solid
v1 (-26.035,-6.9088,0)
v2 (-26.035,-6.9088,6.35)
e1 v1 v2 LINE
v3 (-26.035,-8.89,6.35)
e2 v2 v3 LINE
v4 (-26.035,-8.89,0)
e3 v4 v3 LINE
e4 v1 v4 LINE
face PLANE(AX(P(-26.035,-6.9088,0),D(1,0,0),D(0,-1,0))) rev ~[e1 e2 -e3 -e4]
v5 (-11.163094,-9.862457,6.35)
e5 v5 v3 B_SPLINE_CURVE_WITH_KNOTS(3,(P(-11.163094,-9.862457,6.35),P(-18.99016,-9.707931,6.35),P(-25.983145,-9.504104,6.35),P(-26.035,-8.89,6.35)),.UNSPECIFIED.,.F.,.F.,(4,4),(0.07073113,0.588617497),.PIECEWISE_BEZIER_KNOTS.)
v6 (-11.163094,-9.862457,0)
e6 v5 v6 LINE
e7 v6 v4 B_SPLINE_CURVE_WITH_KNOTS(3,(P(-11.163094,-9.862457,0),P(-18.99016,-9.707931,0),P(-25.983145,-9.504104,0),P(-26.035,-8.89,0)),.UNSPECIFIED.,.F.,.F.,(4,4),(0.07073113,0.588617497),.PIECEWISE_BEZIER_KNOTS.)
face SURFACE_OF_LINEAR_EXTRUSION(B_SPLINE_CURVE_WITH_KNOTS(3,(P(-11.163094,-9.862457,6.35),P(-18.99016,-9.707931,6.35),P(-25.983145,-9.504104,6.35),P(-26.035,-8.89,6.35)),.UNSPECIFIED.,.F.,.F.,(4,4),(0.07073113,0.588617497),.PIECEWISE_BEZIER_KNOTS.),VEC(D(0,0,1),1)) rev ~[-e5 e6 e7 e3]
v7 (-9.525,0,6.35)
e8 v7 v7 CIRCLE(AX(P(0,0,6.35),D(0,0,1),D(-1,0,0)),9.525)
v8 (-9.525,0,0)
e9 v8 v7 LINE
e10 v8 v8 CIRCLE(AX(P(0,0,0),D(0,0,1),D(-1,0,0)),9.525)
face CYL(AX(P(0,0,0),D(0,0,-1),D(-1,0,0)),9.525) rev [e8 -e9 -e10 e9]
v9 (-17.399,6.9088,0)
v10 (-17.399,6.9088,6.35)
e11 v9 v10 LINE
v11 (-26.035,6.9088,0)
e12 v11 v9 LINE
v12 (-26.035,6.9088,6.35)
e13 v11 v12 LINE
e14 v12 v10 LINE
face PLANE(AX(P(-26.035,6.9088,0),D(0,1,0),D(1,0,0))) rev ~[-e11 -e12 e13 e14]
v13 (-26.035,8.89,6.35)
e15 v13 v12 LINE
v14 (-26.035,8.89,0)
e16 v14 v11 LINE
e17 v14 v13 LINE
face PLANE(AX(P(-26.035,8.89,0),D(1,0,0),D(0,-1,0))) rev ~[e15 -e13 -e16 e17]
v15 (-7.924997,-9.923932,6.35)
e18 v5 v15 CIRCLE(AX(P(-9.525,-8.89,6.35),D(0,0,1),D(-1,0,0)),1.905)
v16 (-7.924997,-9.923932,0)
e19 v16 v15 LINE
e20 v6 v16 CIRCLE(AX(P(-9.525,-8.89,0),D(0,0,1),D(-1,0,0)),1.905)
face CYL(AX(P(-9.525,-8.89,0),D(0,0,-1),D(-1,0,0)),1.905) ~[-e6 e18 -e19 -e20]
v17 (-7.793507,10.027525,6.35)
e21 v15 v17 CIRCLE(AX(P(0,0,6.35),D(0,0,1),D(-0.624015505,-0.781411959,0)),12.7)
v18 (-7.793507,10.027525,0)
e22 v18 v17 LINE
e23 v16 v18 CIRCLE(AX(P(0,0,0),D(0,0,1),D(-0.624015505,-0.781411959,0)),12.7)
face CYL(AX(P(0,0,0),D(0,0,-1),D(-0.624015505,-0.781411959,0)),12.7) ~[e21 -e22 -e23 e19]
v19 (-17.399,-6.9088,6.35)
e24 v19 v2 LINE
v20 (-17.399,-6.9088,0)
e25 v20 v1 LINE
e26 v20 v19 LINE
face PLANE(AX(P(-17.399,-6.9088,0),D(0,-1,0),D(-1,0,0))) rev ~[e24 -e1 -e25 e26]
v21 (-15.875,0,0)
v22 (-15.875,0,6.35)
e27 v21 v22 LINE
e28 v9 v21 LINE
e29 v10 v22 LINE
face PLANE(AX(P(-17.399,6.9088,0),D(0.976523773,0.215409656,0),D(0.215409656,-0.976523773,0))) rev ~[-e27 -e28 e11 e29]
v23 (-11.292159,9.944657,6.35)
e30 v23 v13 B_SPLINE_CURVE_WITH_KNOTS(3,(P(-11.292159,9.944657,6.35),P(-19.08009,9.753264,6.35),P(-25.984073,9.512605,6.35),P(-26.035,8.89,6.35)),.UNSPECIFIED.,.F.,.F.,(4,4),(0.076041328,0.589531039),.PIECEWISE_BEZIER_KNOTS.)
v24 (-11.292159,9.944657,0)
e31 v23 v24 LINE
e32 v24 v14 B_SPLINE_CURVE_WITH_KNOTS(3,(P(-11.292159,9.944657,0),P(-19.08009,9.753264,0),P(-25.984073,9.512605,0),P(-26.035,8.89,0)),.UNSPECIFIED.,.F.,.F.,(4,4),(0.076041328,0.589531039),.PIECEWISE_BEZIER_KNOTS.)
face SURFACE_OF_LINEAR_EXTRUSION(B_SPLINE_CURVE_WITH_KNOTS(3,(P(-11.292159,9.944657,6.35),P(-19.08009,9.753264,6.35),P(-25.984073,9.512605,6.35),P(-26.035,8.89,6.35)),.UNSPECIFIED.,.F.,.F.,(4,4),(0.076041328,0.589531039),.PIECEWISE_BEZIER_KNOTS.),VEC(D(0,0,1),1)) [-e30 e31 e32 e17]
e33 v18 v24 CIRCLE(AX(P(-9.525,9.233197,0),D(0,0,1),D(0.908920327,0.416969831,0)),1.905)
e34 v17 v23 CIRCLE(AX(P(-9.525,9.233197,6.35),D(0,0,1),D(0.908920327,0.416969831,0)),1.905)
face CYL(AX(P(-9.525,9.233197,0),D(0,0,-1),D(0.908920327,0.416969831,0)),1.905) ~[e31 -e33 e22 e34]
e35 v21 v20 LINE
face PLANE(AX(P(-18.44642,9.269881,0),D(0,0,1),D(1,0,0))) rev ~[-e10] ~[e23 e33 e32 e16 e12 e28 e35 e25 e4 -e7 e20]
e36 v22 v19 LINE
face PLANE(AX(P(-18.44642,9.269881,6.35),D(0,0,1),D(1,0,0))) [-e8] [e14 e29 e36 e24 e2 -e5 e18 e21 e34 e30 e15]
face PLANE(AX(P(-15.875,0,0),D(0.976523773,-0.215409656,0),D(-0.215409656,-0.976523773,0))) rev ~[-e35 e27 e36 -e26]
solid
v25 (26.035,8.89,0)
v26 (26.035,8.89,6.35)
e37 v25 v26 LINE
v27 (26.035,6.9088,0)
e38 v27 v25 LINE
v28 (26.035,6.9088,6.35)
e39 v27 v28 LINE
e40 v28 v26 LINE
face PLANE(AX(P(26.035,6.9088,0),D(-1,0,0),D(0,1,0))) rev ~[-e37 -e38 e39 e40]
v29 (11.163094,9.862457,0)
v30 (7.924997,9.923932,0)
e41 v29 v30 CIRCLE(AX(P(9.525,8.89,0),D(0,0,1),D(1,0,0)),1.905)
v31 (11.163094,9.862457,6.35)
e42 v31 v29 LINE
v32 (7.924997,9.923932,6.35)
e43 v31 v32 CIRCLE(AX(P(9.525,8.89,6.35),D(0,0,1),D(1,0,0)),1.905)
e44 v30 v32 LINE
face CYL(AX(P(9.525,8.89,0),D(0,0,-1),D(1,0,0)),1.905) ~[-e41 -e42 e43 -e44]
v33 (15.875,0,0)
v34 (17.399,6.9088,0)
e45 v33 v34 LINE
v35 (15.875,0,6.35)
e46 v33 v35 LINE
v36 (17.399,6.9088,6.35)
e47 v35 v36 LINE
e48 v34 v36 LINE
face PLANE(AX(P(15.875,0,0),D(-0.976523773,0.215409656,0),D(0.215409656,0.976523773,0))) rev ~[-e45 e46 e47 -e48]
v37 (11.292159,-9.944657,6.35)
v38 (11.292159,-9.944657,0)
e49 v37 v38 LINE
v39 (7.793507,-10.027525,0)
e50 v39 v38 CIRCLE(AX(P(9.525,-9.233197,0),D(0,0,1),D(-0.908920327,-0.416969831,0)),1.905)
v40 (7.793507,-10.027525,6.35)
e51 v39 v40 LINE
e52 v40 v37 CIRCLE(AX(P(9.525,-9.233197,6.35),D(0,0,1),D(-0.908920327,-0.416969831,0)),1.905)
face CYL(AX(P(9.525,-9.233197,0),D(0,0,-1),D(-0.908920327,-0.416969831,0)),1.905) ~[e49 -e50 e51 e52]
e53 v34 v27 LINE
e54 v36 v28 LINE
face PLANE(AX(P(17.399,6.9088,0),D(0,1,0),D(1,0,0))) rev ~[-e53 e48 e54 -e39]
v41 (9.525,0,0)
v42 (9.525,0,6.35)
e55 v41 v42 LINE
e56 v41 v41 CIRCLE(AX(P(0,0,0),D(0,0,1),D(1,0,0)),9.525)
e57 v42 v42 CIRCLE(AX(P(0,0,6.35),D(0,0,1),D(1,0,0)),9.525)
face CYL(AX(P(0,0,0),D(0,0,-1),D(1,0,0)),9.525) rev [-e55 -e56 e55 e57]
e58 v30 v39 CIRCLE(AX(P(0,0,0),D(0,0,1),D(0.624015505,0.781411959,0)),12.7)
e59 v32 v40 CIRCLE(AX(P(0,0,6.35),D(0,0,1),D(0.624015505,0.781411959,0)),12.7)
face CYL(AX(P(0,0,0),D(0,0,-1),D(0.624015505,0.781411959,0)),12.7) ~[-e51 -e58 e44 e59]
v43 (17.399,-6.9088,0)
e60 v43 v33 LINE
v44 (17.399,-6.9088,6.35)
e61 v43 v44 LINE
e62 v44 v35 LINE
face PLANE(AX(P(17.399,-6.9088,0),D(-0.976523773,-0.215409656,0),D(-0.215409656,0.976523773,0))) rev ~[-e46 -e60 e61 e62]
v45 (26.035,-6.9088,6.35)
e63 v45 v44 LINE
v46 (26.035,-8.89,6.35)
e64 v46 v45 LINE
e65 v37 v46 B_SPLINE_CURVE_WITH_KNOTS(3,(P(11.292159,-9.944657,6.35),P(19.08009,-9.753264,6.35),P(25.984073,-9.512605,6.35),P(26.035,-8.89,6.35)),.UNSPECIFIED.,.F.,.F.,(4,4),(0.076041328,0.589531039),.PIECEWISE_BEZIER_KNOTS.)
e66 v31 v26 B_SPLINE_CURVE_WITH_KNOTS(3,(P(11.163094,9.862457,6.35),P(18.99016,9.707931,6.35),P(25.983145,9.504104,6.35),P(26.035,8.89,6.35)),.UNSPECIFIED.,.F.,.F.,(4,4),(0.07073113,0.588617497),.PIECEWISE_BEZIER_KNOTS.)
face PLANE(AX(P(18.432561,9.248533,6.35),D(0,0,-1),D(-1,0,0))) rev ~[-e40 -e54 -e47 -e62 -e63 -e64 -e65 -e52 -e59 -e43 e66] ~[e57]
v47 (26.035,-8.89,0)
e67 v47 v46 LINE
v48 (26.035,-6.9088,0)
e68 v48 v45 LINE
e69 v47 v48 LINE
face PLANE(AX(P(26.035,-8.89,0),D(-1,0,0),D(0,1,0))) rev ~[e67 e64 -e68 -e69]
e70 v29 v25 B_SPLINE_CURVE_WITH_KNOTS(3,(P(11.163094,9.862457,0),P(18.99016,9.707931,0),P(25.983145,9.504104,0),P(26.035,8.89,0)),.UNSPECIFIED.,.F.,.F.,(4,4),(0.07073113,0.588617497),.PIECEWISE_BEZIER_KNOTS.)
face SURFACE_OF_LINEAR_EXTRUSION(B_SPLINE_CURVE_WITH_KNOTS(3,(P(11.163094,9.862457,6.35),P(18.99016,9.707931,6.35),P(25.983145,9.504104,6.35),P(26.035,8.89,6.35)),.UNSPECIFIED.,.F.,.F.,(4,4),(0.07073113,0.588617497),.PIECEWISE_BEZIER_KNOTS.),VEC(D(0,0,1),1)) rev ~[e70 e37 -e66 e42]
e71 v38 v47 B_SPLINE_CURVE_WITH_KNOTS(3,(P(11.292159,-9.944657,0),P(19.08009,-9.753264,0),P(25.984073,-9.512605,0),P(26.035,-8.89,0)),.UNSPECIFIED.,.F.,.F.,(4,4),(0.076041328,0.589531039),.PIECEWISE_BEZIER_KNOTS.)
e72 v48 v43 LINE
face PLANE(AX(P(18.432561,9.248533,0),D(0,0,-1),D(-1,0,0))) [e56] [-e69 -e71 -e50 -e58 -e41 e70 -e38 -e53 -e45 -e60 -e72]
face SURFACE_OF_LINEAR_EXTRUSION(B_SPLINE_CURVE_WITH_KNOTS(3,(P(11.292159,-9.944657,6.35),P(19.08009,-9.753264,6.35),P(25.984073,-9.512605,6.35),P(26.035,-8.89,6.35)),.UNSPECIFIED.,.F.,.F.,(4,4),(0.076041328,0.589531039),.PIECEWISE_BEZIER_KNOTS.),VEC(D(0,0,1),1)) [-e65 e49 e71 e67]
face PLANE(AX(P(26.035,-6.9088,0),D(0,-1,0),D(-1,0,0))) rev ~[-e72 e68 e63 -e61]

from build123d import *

# Parameters (mm, degrees)
F0_R     = 9.525
F1_DEPTH = 6.35
F3_COUNT = 2
F5_DEPTH = 6.35
F7_DEPTH = 6.35


with BuildPart() as f1:
    # F0 (on Top) → F1 (new body)
    with BuildSketch(Plane.XY):
        with BuildLine():
            Line((9.525, 0), (12.7, 0))
            ThreePointArc((12.7, 0), (12.1234798492, 3.7830194747), (10.4462619928, 7.2225764363))
            ThreePointArc((10.4462619928, 7.2225764363), (10.00070112, 7.0453500483), (9.525, 6.985))
            Line((9.525, 6.985), (9.525, 0))
        make_face()
        with BuildLine():
            ThreePointArc((9.525, -8.4002604126), (9.9057858228, -7.9476667791), (10.2650859452, -7.4778346155))
            ThreePointArc((10.2650859452, -7.4778346155), (9.9025309799, -7.3659812593), (9.525, -7.3281971973))
            Line((9.525, -7.3281971973), (9.525, -8.4002604126))
        make_face()
        with BuildLine():
            ThreePointArc((11.3988304843, -8.89), (11.0104940402, -8.040581393), (10.2650859452, -7.4778346155))
            ThreePointArc((10.2650859452, -7.4778346155), (9.9057858228, -7.9476667791), (9.525, -8.4002604126))
            Line((9.525, -8.4002604126), (9.525, -8.89))
            Line((9.525, -8.89), (11.3988304843, -8.89))
        make_face()
        with BuildLine():
            ThreePointArc((7.7935067776, -10.0275247248), (8.6973942383, -9.2544764013), (9.525, -8.4002604126))
            Line((9.525, -8.4002604126), (9.525, -7.3281971973))
            ThreePointArc((9.525, -7.3281971973), (7.921532049, -8.2046469895), (7.7935067776, -10.0275247248))
        make_face()
        with BuildLine():
            Line((9.525, 6.985), (9.525, 8.4002604126))
            ThreePointArc((9.525, 8.4002604126), (8.7581956911, 9.196956466), (7.9249969146, 9.9239318772))
            ThreePointArc((7.9249969146, 9.9239318772), (7.8518793788, 7.9791254823), (9.525, 6.985))
        make_face()
        with BuildLine():
            ThreePointArc((10.4462619928, 7.2225764363), (12.1234798492, 3.7830194747), (12.7, 0))
            Line((12.7, 0), (15.875, 0))
            Line((15.875, 0), (17.399, 6.9088))
            Line((17.399, 6.9088), (26.035, 6.9088))
            Line((26.035, 6.9088), (26.035, 8.89))
            Line((26.035, 8.89), (11.43, 8.89))
            ThreePointArc((11.43, 8.89), (11.1657359776, 7.922006998), (10.4462619928, 7.2225764363))
        make_face()
        with BuildLine():
            ThreePointArc((9.525, 6.985), (10.00070112, 7.0453500483), (10.4462619928, 7.2225764363))
            ThreePointArc((10.4462619928, 7.2225764363), (10.0029776208, 7.8249880969), (9.525, 8.4002604126))
            Line((9.525, 8.4002604126), (9.525, 6.985))
        make_face()
        with BuildLine():
            ThreePointArc((9.525, 8.4002604126), (10.0029776208, 7.8249880969), (10.4462619928, 7.2225764363))
            ThreePointArc((10.4462619928, 7.2225764363), (11.1657359776, 7.922006998), (11.43, 8.89))
            Line((11.43, 8.89), (9.525, 8.89))
            Line((9.525, 8.89), (9.525, 8.4002604126))
        make_face()
        with BuildLine():
            Line((9.525, -8.89), (9.525, -8.4002604126))
            ThreePointArc((9.525, -8.4002604126), (8.6973942383, -9.2544764013), (7.7935067776, -10.0275247248))
            ThreePointArc((7.7935067776, -10.0275247248), (9.9315282348, -11.0943150857), (11.43, -9.2331971973))
            ThreePointArc((11.43, -9.2331971973), (11.4221916182, -9.0608923403), (11.3988304843, -8.89))
            Line((11.3988304843, -8.89), (9.525, -8.89))
        make_face()
        with BuildLine():
            ThreePointArc((7.9249969146, 9.9239318772), (8.7581956911, 9.196956466), (9.525, 8.4002604126))
            Line((9.525, 8.4002604126), (9.525, 8.89))
            Line((9.525, 8.89), (11.43, 8.89))
            ThreePointArc((11.43, 8.89), (10.0639893887, 10.7171604852), (7.9249969146, 9.9239318772))
        make_face()
        with BuildLine():
            Line((15.875, 0), (12.7, 0))
            ThreePointArc((12.7, 0), (12.075938711, -3.9321373638), (10.2650859452, -7.4778346155))
            ThreePointArc((10.2650859452, -7.4778346155), (11.0104940402, -8.040581393), (11.3988304843, -8.89))
            Line((11.3988304843, -8.89), (26.035, -8.89))
            Line((26.035, -8.89), (26.035, -6.9088))
            Line((26.035, -6.9088), (17.399, -6.9088))
            Line((17.399, -6.9088), (15.875, 0))
        make_face()
        with BuildLine():
            ThreePointArc((10.2650859452, -7.4778346155), (12.075938711, -3.9321373638), (12.7, 0))
            Line((12.7, 0), (9.525, 0))
            Line((9.525, 0), (9.525, -7.3281971973))
            ThreePointArc((9.525, -7.3281971973), (9.9025309799, -7.3659812593), (10.2650859452, -7.4778346155))
        make_face()
        with BuildLine():
            Line((9.525, -7.3281971973), (9.525, 0))
            Line((9.525, 0), (9.525, 6.985))
            ThreePointArc((9.525, 6.985), (7.8518793788, 7.9791254823), (7.9249969146, 9.9239318772))
            ThreePointArc((7.9249969146, 9.9239318772), (-12.6997241984, 0.0836975719), (7.7935067776, -10.0275247248))
            ThreePointArc((7.7935067776, -10.0275247248), (7.921532049, -8.2046469895), (9.525, -7.3281971973))
        make_face()
        Circle(F0_R, mode=Mode.SUBTRACT)
    extrude(amount=F1_DEPTH)


with BuildPart() as f3_1:
    # F3: instance of F1
    add(f1.part.rotate(Axis((0, 0, 3.175), (0, 0, 1)), 1 * 360 / F3_COUNT))

    # F4 (on face) → F5 (join)
    with BuildSketch(Plane.XY.offset(6.35)):
        with BuildLine():
            ThreePointArc((-11.3988304843, 8.89), (-11.4203300474, 9.4248975143), (-11.292158803, 9.9446567992))
            add(Edge.make_bspline(
                [(-11.292158803, 9.9446567992), (-19.0800902505, 9.7532636566), (-25.9840726435, 9.5126047878), (-26.035, 8.89)],
                knots=[0.0760413278, 0.0760413278, 0.0760413278, 0.0760413278, 0.5895310388, 0.5895310388, 0.5895310388, 0.5895310388], degree=3))
            Line((-26.035, 8.89), (-11.3988304843, 8.89))
        make_face()
        with BuildLine():
            add(Edge.make_bspline(
                [(-11.1630940381, -9.8624571571), (-18.9901595908, -9.7079309813), (-25.9831452308, -9.5041039445), (-26.035, -8.89)],
                knots=[0.0707311301, 0.0707311301, 0.0707311301, 0.0707311301, 0.588617497, 0.588617497, 0.588617497, 0.588617497], degree=3))
            ThreePointArc((-11.1630940381, -9.8624571571), (-11.3620620761, -9.3942102029), (-11.43, -8.89))
            Line((-11.43, -8.89), (-26.035, -8.89))
        make_face()
    extrude(amount=-F5_DEPTH)


with BuildPart() as f1_1:
    add(f1.part)

    # F6 (on face) → F7 (join)
    with BuildSketch(Plane.XY.offset(6.35)):
        with BuildLine():
            add(Edge.make_bspline(
                [(11.1630940381, 9.8624571571), (18.9901595908, 9.7079309813), (25.9831452308, 9.5041039445), (26.035, 8.89)],
                knots=[0.0707311301, 0.0707311301, 0.0707311301, 0.0707311301, 0.588617497, 0.588617497, 0.588617497, 0.588617497], degree=3))
            ThreePointArc((11.1630940381, 9.8624571571), (11.3620620761, 9.3942102029), (11.43, 8.89))
            Line((11.43, 8.89), (26.035, 8.89))
        make_face()
        with BuildLine():
            ThreePointArc((11.3988304843, -8.89), (11.4203300474, -9.4248975143), (11.292158803, -9.9446567992))
            add(Edge.make_bspline(
                [(11.292158803, -9.9446567992), (19.0800902505, -9.7532636566), (25.9840726435, -9.5126047878), (26.035, -8.89)],
                knots=[0.0760413278, 0.0760413278, 0.0760413278, 0.0760413278, 0.5895310388, 0.5895310388, 0.5895310388, 0.5895310388], degree=3))
            Line((26.035, -8.89), (11.3988304843, -8.89))
        make_face()
    extrude(amount=-F7_DEPTH)


solid = Compound([f3_1.part, f1_1.part])
